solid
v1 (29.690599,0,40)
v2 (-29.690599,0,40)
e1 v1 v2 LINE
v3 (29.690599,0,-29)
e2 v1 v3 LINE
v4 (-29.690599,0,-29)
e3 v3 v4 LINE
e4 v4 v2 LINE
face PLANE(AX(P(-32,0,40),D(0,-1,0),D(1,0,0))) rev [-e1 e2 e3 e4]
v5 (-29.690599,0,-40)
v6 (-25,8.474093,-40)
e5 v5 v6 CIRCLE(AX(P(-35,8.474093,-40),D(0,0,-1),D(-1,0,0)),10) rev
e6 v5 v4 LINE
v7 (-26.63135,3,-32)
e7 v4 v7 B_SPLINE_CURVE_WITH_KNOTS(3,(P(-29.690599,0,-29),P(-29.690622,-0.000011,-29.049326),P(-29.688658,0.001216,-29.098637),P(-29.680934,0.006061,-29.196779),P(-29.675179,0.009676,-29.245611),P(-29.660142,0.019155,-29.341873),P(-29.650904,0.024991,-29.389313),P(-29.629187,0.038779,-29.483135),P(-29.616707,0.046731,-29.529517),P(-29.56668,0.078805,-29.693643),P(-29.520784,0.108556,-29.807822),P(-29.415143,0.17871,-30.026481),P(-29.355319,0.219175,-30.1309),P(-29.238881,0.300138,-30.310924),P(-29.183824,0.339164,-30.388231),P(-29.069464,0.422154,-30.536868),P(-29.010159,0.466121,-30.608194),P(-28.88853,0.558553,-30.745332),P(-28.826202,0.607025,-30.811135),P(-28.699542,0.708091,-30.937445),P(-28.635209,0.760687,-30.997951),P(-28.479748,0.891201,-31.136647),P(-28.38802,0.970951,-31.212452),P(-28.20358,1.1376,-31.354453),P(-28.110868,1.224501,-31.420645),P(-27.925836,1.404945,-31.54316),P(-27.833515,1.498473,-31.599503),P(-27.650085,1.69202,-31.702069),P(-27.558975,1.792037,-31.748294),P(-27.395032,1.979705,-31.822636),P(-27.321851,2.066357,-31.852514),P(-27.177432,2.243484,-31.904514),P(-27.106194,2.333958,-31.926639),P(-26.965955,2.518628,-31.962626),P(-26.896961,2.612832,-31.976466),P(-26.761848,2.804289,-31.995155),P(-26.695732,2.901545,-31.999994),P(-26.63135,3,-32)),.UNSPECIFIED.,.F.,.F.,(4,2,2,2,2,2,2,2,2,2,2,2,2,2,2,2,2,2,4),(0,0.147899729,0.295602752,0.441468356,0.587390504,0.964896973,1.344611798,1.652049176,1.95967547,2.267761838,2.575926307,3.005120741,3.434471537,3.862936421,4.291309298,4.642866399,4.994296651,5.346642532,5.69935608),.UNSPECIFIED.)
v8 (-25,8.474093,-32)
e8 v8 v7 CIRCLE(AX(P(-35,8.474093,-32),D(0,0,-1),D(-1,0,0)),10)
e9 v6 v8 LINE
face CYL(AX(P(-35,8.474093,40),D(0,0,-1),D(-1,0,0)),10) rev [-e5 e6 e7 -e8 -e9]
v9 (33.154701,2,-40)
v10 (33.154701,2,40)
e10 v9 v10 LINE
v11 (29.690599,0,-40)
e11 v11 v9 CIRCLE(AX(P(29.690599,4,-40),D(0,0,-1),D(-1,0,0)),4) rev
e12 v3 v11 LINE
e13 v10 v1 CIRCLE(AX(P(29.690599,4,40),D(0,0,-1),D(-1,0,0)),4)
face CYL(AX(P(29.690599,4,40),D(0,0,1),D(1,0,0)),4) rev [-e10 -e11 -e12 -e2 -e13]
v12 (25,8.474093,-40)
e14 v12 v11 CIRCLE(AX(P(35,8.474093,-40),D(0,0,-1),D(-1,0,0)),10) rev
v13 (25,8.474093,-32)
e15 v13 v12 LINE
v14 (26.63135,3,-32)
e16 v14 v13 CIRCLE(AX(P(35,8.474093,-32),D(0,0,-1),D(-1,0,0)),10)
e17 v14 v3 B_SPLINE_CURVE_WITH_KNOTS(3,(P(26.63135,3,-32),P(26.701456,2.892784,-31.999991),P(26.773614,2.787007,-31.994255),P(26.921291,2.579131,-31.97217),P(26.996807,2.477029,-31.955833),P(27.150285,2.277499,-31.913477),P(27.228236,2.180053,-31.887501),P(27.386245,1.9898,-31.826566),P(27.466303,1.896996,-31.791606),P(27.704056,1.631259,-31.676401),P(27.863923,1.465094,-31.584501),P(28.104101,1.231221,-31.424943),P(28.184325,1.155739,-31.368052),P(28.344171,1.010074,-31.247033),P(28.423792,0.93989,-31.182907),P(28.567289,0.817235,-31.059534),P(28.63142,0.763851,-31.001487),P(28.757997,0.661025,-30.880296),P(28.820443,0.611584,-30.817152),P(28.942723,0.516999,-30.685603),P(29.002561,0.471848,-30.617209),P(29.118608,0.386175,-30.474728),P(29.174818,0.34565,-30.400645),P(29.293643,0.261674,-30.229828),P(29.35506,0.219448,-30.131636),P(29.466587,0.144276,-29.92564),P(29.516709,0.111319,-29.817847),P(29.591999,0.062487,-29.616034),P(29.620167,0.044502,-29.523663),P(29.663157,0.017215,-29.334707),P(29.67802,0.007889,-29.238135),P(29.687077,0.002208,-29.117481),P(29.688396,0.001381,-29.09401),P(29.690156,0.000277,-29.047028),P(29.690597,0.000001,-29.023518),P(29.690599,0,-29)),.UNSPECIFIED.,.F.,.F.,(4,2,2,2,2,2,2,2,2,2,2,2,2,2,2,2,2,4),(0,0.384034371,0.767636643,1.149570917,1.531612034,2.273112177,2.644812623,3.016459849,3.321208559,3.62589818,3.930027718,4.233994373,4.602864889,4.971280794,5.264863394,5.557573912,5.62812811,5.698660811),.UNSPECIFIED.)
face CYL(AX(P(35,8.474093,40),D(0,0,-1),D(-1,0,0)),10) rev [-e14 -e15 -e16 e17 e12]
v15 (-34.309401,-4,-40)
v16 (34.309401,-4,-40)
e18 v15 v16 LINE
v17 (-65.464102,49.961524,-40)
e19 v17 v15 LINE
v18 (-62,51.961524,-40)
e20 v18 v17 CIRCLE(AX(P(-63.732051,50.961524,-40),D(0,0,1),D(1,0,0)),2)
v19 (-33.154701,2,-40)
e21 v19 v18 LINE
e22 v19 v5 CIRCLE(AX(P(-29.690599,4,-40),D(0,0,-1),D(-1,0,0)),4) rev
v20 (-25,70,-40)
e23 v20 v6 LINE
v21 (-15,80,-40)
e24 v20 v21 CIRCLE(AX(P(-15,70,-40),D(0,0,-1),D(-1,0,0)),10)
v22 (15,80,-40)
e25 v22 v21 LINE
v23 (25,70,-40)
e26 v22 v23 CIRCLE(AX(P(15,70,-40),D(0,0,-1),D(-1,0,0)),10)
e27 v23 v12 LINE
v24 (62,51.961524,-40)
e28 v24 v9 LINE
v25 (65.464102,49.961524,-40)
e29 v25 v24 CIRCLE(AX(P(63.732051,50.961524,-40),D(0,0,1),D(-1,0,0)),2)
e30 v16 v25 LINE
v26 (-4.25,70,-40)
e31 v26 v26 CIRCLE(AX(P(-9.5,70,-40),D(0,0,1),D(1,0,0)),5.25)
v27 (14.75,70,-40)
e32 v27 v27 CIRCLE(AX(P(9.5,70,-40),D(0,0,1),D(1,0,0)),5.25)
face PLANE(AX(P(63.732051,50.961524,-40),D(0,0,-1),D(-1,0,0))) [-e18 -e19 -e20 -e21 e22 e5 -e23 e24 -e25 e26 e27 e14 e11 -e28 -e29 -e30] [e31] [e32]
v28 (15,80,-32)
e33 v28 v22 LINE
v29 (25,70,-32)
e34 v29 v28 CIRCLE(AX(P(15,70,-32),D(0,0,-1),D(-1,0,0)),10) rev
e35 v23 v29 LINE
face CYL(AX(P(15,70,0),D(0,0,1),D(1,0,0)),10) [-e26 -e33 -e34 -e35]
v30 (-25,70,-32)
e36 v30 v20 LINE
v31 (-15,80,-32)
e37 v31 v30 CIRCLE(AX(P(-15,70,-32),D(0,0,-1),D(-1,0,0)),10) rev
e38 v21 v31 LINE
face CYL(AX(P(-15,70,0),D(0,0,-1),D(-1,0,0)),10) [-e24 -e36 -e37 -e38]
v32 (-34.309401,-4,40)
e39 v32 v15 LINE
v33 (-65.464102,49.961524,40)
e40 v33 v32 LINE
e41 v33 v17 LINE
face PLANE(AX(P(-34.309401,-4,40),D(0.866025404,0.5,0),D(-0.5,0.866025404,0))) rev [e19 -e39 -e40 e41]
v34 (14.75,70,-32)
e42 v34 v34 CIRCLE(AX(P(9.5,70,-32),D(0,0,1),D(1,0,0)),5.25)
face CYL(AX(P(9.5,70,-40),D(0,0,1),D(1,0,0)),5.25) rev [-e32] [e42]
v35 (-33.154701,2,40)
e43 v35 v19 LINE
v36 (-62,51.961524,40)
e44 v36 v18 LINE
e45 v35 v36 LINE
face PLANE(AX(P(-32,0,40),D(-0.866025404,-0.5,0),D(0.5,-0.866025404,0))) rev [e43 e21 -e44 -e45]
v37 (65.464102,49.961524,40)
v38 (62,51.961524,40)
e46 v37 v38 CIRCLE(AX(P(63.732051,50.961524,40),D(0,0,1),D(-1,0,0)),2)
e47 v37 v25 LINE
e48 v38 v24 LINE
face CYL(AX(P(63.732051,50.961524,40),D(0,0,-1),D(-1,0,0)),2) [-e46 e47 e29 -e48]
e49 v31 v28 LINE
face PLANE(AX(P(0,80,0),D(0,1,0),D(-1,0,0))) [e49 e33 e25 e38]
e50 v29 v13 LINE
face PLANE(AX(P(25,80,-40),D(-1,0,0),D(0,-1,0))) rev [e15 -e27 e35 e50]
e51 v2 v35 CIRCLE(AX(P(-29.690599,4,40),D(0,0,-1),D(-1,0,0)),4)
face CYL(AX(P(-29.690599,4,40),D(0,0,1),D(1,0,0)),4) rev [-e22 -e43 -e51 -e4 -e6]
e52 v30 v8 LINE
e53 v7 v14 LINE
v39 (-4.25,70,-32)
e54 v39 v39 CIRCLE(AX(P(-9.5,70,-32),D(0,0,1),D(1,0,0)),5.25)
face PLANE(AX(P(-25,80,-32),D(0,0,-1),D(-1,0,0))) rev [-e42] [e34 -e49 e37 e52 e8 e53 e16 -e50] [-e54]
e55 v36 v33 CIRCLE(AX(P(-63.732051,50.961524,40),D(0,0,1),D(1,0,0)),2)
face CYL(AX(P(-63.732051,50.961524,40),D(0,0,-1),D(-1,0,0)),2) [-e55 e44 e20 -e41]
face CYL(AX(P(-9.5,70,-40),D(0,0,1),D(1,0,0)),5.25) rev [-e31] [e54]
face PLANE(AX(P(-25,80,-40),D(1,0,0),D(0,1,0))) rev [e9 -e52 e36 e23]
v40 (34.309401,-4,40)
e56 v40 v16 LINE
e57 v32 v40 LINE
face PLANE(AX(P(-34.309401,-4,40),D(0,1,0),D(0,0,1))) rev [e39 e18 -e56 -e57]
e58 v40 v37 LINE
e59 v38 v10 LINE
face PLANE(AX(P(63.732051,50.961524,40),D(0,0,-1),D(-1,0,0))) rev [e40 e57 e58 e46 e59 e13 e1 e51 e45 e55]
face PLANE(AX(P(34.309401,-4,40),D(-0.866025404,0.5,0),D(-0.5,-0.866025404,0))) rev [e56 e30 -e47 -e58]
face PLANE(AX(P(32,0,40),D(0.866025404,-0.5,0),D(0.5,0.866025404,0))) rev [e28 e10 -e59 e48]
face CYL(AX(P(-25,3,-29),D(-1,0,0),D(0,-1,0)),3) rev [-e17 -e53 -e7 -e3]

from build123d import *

# Parameters (mm, degrees)
BOSS_EXTRUDE2_DEPTH = 40
FILLET1_R           = 4
SKETCH3_W           = 50
SKETCH3_H           = 8
BOSS_EXTRUDE3_DEPTH = 80
SKETCH5_R           = 5.25
CUT_EXTRUDE1_DEPTH  = 127.113847389
FILLET2_R           = 10
FILLET3_R           = 3


with BuildPart() as part:
    # Sketch2 → Boss-Extrude2 (new, symmetric)
    with BuildSketch(Plane.XY):
        with BuildLine():
            Line((-32, 0), (32, 0))
            Line((32, 0), (62, 51.961524227))
            ThreePointArc((62, 51.961524227), (64.732050808, 52.693575035), (65.464101615, 49.961524227))
            Line((65.464101615, 49.961524227), (34.309401077, -4))
            Line((34.309401077, -4), (-34.309401077, -4))
            Line((-34.309401077, -4), (-65.464101615, 49.961524227))
            ThreePointArc((-65.464101615, 49.961524227), (-64.732050808, 52.693575035), (-62, 51.961524227))
            Line((-62, 51.961524227), (-32, 0))
        make_face()
    extrude(amount=BOSS_EXTRUDE2_DEPTH, both=True)

    # Fillet1
    fillet1_edges = [part.edges().sort_by_distance(p)[0] for p in [
        (-32, 0, 0),
        (32, 0, 0),
    ]]
    fillet(fillet1_edges, radius=FILLET1_R)

    # Sketch3 → Boss-Extrude3 (add)
    with BuildSketch(Plane(origin=(0, 0, 0), x_dir=(1, 0, 0), z_dir=(0, 1, 0))):
        with Locations((0, 36)):
            Rectangle(SKETCH3_W, SKETCH3_H)
    extrude(amount=BOSS_EXTRUDE3_DEPTH)

    # Sketch5 → Cut-Extrude1 (cut, through all)
    with BuildSketch(Plane.XY.offset(-32)):
        with Locations((-9.5, 70)):
            Circle(SKETCH5_R)
        with Locations((9.5, 70)):
            Circle(SKETCH5_R)
    extrude(amount=-CUT_EXTRUDE1_DEPTH, mode=Mode.SUBTRACT)

    # Fillet2
    # the kernel refuses this fillet: 10 mm, written as the material it adds along each edge
    with BuildSketch(Plane(origin=(25, 0, -40), x_dir=(1, 0, 0), z_dir=(0, 0, 1)), Plane(origin=(-25, 0, -32), x_dir=(-1, 0, 0), z_dir=(0, 0, -1))) as fillet2_piece_1:
        with BuildLine():
            CenterArc((10, 8.474093474), FILLET2_R, 180, 57.931003855)
            Line((0, 8.474093474), (0, 0))
            Line((0, 0), (4.690598923, 0))
        make_face()
    extrude(amount=8)
    # the kernel refuses this fillet: 10 mm, written as the material it takes off along each edge
    with BuildSketch(Plane(origin=(25, 80, -65), x_dir=(0, -1, 0), z_dir=(0, 0, 1))) as fillet2_2_piece_1:
        with BuildLine():
            CenterArc((FILLET2_R, -FILLET2_R), FILLET2_R, 90, 90)
            Line((0, -FILLET2_R), (0, 0))
            Line((0, 0), (FILLET2_R, 0))
        make_face()
    extrude(amount=58, mode=Mode.SUBTRACT)
    with BuildSketch(Plane(origin=(-25, 80, -7), x_dir=(1, 0, 0), z_dir=(0, 0, -1))) as fillet2_2_piece_2:
        with BuildLine():
            CenterArc((FILLET2_R, FILLET2_R), FILLET2_R, 180, 90)
            Line((0, FILLET2_R), (0, 0))
            Line((0, 0), (FILLET2_R, 0))
        make_face()
    extrude(amount=58, mode=Mode.SUBTRACT)

    # Fillet3
    # the kernel refuses this fillet: 3 mm, written as the material it adds along each edge
    with BuildSketch(Plane(origin=(-37.190598923, 0, -32), x_dir=(0, 1, 0), z_dir=(1, 0, 0))) as fillet3_piece_1_section:
        with BuildLine():
            CenterArc((FILLET3_R, FILLET3_R), FILLET3_R, 180, 90)
            Line((0, FILLET3_R), (0, 0))
            Line((0, 0), (FILLET3_R, 0))
        make_face()
    fillet3_piece_1 = extrude(amount=74.381197846, mode=Mode.PRIVATE)
    fillet3_piece_1 = fillet3_piece_1 - Plane(origin=(35, 8.474093474, -32), x_dir=(1, 0, 0), z_dir=(0, 0, -1)) * Cylinder(10, 161, mode=Mode.PRIVATE)
    fillet3_piece_1 = fillet3_piece_1 - Plane(origin=(-35, 8.474093474, -32), x_dir=(-1, 0, 0), z_dir=(0, 0, 1)) * Cylinder(10, 161, mode=Mode.PRIVATE)
    add(fillet3_piece_1)


solid = part.part
